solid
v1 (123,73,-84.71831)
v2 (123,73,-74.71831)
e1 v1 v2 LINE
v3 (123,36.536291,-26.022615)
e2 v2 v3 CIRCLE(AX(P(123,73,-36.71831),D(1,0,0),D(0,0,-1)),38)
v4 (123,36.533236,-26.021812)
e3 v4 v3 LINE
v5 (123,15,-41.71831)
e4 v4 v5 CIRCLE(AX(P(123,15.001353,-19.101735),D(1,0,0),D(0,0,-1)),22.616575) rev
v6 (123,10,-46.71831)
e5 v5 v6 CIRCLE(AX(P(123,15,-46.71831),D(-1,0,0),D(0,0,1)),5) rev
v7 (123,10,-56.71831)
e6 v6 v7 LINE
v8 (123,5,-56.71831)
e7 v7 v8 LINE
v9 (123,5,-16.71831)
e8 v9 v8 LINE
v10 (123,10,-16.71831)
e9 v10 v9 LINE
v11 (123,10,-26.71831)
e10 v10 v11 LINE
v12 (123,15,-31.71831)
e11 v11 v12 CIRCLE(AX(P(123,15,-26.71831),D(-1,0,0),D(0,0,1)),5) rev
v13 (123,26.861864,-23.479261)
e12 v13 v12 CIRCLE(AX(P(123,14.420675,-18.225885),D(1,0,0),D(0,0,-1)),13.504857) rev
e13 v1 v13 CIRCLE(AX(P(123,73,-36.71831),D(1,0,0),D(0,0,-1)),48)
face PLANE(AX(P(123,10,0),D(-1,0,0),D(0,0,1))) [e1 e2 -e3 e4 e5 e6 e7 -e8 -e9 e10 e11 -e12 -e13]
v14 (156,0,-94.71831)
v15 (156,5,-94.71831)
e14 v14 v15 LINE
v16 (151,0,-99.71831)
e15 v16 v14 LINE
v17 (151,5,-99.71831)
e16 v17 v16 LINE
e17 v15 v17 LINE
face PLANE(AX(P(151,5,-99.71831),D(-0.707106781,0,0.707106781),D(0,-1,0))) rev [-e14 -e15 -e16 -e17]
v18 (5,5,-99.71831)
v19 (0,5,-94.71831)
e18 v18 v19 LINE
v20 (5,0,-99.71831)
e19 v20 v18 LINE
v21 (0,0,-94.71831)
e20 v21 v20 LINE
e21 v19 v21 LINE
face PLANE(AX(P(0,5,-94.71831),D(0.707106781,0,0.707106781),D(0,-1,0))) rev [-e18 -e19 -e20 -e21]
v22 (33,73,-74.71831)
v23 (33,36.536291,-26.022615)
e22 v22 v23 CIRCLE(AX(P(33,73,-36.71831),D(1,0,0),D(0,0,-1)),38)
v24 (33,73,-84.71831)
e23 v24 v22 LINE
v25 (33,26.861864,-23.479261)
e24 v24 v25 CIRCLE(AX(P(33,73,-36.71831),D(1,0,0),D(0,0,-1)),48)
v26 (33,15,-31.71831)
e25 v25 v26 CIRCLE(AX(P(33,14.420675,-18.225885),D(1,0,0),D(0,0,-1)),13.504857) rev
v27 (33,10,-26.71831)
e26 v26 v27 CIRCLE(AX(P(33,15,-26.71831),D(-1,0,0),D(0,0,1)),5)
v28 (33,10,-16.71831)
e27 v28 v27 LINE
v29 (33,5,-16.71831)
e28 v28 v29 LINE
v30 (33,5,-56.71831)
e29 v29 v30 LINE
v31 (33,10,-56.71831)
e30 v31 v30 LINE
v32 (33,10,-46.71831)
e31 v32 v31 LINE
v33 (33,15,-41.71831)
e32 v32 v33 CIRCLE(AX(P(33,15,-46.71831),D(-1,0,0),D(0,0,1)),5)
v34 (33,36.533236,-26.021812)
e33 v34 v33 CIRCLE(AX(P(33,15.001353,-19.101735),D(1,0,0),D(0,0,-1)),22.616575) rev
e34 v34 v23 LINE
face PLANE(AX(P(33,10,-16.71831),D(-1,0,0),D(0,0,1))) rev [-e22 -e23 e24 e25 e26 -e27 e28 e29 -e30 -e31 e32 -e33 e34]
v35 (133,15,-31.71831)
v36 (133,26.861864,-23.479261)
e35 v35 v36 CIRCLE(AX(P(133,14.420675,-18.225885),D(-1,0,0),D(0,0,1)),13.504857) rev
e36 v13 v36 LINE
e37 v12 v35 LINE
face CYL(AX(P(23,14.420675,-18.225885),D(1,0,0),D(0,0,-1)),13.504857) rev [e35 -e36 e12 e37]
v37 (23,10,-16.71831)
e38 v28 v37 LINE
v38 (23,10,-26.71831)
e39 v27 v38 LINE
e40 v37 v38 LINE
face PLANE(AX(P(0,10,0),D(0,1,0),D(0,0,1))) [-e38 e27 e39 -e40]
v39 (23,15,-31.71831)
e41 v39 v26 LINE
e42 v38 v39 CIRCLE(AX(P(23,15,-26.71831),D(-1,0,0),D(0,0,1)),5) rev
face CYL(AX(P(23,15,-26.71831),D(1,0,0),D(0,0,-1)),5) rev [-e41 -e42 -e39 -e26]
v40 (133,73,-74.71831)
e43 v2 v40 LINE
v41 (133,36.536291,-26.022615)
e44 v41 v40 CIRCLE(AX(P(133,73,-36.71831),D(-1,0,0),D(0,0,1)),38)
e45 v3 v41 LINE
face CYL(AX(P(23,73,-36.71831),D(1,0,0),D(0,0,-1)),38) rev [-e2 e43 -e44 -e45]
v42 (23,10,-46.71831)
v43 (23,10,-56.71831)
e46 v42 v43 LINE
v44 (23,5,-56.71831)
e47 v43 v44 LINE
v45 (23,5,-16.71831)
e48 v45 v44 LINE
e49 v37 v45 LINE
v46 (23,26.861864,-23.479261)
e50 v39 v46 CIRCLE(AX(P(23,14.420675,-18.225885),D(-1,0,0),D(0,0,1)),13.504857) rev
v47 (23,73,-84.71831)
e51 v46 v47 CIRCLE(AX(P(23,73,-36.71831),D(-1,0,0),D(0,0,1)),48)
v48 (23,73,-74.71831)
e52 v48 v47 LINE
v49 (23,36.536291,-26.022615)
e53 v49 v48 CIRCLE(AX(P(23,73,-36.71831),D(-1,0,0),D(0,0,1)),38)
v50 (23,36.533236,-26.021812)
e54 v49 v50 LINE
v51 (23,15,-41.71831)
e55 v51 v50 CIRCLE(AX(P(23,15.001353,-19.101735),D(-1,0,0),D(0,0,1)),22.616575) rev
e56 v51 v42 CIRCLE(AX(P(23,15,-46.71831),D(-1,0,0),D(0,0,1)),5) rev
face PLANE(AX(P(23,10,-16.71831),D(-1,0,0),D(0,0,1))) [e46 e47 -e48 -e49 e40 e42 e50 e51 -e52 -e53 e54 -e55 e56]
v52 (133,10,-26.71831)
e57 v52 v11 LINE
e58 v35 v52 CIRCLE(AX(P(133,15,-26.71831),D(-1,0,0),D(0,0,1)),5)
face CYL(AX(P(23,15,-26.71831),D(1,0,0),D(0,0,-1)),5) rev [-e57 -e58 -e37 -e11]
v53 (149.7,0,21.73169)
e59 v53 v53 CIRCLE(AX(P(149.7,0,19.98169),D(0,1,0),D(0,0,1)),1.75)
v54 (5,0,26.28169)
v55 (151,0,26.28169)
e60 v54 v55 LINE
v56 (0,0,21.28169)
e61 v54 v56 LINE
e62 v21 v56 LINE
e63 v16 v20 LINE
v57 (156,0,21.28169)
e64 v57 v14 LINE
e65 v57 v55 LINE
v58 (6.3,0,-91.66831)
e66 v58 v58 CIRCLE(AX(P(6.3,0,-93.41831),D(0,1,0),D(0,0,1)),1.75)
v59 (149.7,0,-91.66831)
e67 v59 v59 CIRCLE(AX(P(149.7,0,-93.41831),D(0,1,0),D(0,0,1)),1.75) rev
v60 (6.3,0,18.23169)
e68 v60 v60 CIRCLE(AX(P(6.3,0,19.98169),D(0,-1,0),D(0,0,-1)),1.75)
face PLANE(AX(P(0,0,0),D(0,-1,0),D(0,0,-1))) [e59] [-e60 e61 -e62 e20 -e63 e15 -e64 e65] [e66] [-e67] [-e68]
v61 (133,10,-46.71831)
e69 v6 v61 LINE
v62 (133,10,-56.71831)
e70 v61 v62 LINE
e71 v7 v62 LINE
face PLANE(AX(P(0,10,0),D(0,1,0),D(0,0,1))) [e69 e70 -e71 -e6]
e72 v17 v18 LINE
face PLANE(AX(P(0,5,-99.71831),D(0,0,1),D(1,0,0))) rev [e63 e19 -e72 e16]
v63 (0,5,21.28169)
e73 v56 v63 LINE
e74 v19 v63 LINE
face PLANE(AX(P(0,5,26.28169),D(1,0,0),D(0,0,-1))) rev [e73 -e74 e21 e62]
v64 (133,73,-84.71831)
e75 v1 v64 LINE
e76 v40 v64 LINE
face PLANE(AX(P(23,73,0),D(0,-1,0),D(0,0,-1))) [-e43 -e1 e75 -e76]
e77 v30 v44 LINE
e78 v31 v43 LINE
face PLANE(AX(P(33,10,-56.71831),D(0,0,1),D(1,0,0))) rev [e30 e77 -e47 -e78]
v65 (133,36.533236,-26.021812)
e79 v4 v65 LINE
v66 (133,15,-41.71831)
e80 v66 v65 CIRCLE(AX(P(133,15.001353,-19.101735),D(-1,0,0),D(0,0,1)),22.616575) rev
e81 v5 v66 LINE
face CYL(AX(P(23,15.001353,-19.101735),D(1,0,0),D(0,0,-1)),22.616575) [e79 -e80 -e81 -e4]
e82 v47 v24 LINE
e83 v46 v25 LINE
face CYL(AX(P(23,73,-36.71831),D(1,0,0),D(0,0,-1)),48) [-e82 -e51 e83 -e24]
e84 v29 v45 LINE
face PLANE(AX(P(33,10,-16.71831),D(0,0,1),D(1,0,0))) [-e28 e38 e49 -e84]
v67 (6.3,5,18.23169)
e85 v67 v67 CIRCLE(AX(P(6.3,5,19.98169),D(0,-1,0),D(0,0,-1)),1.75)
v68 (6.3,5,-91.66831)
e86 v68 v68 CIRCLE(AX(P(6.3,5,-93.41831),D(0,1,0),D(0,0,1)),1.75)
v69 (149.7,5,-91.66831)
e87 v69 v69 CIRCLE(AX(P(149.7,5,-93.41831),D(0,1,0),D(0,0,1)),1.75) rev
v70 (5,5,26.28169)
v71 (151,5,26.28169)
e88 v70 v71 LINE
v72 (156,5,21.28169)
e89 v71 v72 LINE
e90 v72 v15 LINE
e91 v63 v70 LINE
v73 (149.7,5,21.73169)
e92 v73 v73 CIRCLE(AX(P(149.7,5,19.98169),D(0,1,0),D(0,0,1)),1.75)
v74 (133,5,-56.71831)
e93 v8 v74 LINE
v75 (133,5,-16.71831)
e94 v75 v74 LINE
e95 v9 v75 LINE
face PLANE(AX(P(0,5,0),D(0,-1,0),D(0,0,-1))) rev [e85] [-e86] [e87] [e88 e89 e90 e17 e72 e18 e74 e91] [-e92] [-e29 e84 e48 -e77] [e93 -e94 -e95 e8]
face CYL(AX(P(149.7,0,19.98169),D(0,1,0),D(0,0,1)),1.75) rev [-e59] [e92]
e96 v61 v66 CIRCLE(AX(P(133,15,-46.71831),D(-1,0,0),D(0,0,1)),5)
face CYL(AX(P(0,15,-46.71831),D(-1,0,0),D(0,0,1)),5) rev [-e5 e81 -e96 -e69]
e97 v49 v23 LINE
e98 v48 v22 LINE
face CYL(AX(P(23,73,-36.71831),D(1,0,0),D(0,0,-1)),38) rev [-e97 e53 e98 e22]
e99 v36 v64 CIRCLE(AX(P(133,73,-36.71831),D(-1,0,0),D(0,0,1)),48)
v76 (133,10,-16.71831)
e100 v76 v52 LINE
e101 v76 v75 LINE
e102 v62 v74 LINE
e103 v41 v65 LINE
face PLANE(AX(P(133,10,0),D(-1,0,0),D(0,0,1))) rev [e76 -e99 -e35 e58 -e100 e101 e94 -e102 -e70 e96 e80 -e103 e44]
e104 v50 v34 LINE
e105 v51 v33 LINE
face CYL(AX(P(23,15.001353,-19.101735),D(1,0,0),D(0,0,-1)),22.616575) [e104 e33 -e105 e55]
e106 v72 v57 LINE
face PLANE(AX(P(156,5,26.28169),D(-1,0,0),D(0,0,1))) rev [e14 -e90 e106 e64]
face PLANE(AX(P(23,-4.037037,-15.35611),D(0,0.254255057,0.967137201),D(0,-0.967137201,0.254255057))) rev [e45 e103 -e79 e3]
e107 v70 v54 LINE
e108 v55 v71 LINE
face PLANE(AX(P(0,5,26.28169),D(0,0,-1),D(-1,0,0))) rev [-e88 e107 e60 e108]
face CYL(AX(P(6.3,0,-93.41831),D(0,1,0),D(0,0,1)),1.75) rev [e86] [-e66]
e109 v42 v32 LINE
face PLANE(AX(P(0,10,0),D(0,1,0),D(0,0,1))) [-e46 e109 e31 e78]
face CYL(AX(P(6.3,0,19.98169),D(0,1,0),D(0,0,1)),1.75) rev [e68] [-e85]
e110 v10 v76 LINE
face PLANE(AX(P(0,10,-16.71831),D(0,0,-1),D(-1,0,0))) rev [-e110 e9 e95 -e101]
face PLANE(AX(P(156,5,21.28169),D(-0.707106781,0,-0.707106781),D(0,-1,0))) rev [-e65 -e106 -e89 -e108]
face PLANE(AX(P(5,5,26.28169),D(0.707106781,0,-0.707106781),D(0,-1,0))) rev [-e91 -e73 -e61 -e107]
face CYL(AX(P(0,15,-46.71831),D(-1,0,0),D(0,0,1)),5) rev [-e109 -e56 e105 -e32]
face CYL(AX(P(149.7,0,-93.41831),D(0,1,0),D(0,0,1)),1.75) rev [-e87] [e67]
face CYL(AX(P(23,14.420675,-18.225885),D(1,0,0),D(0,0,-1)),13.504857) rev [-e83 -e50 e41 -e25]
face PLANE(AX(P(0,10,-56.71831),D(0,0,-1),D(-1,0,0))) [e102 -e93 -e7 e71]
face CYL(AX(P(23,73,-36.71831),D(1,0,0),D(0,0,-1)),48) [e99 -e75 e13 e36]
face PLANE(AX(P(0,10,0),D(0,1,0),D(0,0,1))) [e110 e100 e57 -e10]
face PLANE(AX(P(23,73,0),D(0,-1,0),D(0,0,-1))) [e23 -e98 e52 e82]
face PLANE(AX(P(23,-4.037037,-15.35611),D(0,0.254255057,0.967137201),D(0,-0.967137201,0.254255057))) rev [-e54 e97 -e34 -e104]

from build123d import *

# Parameters (mm, degrees)
SKETCH1_W                = 156
SKETCH1_H                = 126
BOSS_EXTRUDE1_DEPTH      = 5
CHAMFER1_SIZE            = 5
SKETCH2_R                = 1.75
CUT_EXTRUDE1_DEPTH       = 186.215391696
SKETCH3_W                = 5
SKETCH3_H                = 20
SKETCH3_W_2              = 10
SKETCH3_H_2              = 40
BOSS_EXTRUDE2_DEPTH      = 5
BOSS_EXTRUDE3_DEPTH      = 100
BOSS_EXTRUDE3_DEPTH_BACK = 10
SKETCH6_W                = 5
SKETCH6_H                = 5
SKETCH9_W                = 90
SKETCH9_H                = 28
SKETCH9_H_2              = 40
CUT_EXTRUDE3_DEPTH       = 219.48510549
FILLET1_R                = 5


with BuildPart() as part:
    # Sketch1 → Boss-Extrude1 (new body)
    with BuildSketch(Plane(origin=(0, 0, 0), x_dir=(1, 0, 0), z_dir=(0, 1, 0))):
        with Locations((78, 36.718309859)):
            Rectangle(SKETCH1_W, SKETCH1_H)
    extrude(amount=BOSS_EXTRUDE1_DEPTH)

    # Chamfer1
    chamfer1_edges = [part.edges().sort_by_distance(p)[0] for p in [
        (0, 2.5, -99.718309859),
        (156, 2.5, -99.718309859),
        (156, 2.5, 26.281690141),
        (0, 2.5, 26.281690141),
    ]]
    chamfer(chamfer1_edges, length=CHAMFER1_SIZE)

    # Sketch2 → Cut-Extrude1 (cut, through all)
    with BuildSketch(Plane(origin=(0, 5, 0), x_dir=(1, 0, 0), z_dir=(0, 1, 0))):
        with BuildLine():
            ThreePointArc((8.05, 93.418309859), (7.537436867, 94.655746726), (6.3, 95.168309859))
            Line((6.3, 95.168309859), (6.3, 93.418309859))
            Line((6.3, 93.418309859), (4.55, 93.418309859))
            ThreePointArc((4.55, 93.418309859), (6.3, 91.668309859), (8.05, 93.418309859))
        make_face()
        with BuildLine():
            Line((6.3, 93.418309859), (6.3, 95.168309859))
            ThreePointArc((6.3, 95.168309859), (5.062563133, 94.655746726), (4.55, 93.418309859))
            Line((4.55, 93.418309859), (6.3, 93.418309859))
        make_face()
        with Locations(Location((149.7, -19.981690141, 0), (0, 0, 270))):
            Circle(SKETCH2_R)
        with Locations(Location((149.7, 93.418309859, 0), (0, 0, 270))):
            Circle(SKETCH2_R)
        with Locations(Location((6.3, -19.981690141, 0), (0, 0, 90))):
            Circle(SKETCH2_R)
    extrude(amount=-CUT_EXTRUDE1_DEPTH, mode=Mode.SUBTRACT)

    # Sketch3 → Boss-Extrude2 (add)
    with BuildSketch(Plane(origin=(0, 5, 0), x_dir=(1, 0, 0), z_dir=(0, 1, 0))):
        with Locations((130.5, 46.718309859)):
            Rectangle(SKETCH3_W, SKETCH3_H)
        with Locations((125.5, 46.718309859)):
            Rectangle(SKETCH3_W, SKETCH3_H)
        Polygon((128, 36.718309859), (123, 36.718309859), (123, 16.718309859), (133, 16.718309859), (133, 36.718309859), align=None)
        with Locations((28, 36.718309859)):
            Rectangle(SKETCH3_W_2, SKETCH3_H_2)
    extrude(amount=BOSS_EXTRUDE2_DEPTH)

    # Sketch6 → Boss-Extrude3 (add, two sides: drawn at the far end of the back side and taken through both)
    with BuildSketch(Plane.ZY.offset(-123).offset(-BOSS_EXTRUDE3_DEPTH_BACK)):
        with BuildLine():
            ThreePointArc((-47.881645859, 119.68382942), (-74.400136566, 102.733481734), (-84.718309859, 73))
            Line((-84.718309859, 73), (-74.718309859, 73))
            ThreePointArc((-74.718309859, 73), (-66.480360629, 96.626686903), (-45.338292281, 110.009402901))
            Line((-45.338292281, 110.009402901), (-47.881645859, 119.68382942))
        make_face()
        with BuildLine():
            ThreePointArc((11.281690141, 73), (-6.984828126, 110.681826707), (-47.881645859, 119.68382942))
            Line((-47.881645859, 119.68382942), (-45.338292281, 110.009402901))
            ThreePointArc((-45.338292281, 110.009402901), (-13.091622957, 102.76205077), (1.281690141, 73))
            Line((1.281690141, 73), (11.281690141, 73))
        make_face()
        with BuildLine():
            Line((-26.022614728, 36.536290566), (-26.021811715, 36.53323606))
            Line((-26.021811715, 36.53323606), (-23.47926115, 26.861864046))
            ThreePointArc((-23.47926115, 26.861864046), (1.618841431, 44.116391656), (11.281690141, 73))
            Line((11.281690141, 73), (1.281690141, 73))
            ThreePointArc((1.281690141, 73), (-6.30091011, 50.223218126), (-26.022614728, 36.536290566))
        make_face()
        with BuildLine():
            ThreePointArc((-26.021811715, 36.53323606), (-33.846189614, 32.151003399), (-39.352290573, 25.072323803))
            ThreePointArc((-39.352290573, 25.072323803), (-31.340812266, 25.302174896), (-23.47926115, 26.861864046))
            Line((-23.47926115, 26.861864046), (-26.021811715, 36.53323606))
        make_face()
        with BuildLine():
            ThreePointArc((-39.352290573, 25.072323803), (-41.119015586, 20.173278405), (-41.718309859, 15))
            Line((-41.718309859, 15), (-36.718309859, 15))
            Line((-36.718309859, 15), (-31.718309859, 15))
            ThreePointArc((-31.718309859, 15), (-29.317648494, 22.124824976), (-23.47926115, 26.861864046))
            ThreePointArc((-23.47926115, 26.861864046), (-31.340812266, 25.302174896), (-39.352290573, 25.072323803))
        make_face()
        with Locations((-34.218309859, 12.5)):
            Rectangle(SKETCH6_W, SKETCH6_H)
        with Locations((-39.218309859, 12.5)):
            Rectangle(SKETCH6_W, SKETCH6_H)
    extrude(amount=BOSS_EXTRUDE3_DEPTH + BOSS_EXTRUDE3_DEPTH_BACK)

    # Sketch9 → Cut-Extrude3 (cut, through all)
    with BuildSketch(Plane(origin=(0, 5, 0), x_dir=(1, 0, 0), z_dir=(0, 1, 0))):
        with Locations((78, 70.718309859)):
            Rectangle(SKETCH9_W, SKETCH9_H)
        with Locations((78, 36.718309859)):
            Rectangle(SKETCH9_W, SKETCH9_H_2)
        with Locations((78, 2.718309859)):
            Rectangle(SKETCH9_W, SKETCH9_H)
    extrude(amount=CUT_EXTRUDE3_DEPTH, mode=Mode.SUBTRACT)

    # Fillet1
    fillet1_edges = [part.edges().sort_by_distance(p)[0] for p in [
        (28, 10, -41.718309859),
        (28, 10, -31.718309859),
        (128, 10, -31.718309859),
        (128, 10, -41.718309859),
    ]]
    fillet(fillet1_edges, radius=FILLET1_R - 0.0001)  # a hair under: the kernel refuses the full size


solid = part.part
